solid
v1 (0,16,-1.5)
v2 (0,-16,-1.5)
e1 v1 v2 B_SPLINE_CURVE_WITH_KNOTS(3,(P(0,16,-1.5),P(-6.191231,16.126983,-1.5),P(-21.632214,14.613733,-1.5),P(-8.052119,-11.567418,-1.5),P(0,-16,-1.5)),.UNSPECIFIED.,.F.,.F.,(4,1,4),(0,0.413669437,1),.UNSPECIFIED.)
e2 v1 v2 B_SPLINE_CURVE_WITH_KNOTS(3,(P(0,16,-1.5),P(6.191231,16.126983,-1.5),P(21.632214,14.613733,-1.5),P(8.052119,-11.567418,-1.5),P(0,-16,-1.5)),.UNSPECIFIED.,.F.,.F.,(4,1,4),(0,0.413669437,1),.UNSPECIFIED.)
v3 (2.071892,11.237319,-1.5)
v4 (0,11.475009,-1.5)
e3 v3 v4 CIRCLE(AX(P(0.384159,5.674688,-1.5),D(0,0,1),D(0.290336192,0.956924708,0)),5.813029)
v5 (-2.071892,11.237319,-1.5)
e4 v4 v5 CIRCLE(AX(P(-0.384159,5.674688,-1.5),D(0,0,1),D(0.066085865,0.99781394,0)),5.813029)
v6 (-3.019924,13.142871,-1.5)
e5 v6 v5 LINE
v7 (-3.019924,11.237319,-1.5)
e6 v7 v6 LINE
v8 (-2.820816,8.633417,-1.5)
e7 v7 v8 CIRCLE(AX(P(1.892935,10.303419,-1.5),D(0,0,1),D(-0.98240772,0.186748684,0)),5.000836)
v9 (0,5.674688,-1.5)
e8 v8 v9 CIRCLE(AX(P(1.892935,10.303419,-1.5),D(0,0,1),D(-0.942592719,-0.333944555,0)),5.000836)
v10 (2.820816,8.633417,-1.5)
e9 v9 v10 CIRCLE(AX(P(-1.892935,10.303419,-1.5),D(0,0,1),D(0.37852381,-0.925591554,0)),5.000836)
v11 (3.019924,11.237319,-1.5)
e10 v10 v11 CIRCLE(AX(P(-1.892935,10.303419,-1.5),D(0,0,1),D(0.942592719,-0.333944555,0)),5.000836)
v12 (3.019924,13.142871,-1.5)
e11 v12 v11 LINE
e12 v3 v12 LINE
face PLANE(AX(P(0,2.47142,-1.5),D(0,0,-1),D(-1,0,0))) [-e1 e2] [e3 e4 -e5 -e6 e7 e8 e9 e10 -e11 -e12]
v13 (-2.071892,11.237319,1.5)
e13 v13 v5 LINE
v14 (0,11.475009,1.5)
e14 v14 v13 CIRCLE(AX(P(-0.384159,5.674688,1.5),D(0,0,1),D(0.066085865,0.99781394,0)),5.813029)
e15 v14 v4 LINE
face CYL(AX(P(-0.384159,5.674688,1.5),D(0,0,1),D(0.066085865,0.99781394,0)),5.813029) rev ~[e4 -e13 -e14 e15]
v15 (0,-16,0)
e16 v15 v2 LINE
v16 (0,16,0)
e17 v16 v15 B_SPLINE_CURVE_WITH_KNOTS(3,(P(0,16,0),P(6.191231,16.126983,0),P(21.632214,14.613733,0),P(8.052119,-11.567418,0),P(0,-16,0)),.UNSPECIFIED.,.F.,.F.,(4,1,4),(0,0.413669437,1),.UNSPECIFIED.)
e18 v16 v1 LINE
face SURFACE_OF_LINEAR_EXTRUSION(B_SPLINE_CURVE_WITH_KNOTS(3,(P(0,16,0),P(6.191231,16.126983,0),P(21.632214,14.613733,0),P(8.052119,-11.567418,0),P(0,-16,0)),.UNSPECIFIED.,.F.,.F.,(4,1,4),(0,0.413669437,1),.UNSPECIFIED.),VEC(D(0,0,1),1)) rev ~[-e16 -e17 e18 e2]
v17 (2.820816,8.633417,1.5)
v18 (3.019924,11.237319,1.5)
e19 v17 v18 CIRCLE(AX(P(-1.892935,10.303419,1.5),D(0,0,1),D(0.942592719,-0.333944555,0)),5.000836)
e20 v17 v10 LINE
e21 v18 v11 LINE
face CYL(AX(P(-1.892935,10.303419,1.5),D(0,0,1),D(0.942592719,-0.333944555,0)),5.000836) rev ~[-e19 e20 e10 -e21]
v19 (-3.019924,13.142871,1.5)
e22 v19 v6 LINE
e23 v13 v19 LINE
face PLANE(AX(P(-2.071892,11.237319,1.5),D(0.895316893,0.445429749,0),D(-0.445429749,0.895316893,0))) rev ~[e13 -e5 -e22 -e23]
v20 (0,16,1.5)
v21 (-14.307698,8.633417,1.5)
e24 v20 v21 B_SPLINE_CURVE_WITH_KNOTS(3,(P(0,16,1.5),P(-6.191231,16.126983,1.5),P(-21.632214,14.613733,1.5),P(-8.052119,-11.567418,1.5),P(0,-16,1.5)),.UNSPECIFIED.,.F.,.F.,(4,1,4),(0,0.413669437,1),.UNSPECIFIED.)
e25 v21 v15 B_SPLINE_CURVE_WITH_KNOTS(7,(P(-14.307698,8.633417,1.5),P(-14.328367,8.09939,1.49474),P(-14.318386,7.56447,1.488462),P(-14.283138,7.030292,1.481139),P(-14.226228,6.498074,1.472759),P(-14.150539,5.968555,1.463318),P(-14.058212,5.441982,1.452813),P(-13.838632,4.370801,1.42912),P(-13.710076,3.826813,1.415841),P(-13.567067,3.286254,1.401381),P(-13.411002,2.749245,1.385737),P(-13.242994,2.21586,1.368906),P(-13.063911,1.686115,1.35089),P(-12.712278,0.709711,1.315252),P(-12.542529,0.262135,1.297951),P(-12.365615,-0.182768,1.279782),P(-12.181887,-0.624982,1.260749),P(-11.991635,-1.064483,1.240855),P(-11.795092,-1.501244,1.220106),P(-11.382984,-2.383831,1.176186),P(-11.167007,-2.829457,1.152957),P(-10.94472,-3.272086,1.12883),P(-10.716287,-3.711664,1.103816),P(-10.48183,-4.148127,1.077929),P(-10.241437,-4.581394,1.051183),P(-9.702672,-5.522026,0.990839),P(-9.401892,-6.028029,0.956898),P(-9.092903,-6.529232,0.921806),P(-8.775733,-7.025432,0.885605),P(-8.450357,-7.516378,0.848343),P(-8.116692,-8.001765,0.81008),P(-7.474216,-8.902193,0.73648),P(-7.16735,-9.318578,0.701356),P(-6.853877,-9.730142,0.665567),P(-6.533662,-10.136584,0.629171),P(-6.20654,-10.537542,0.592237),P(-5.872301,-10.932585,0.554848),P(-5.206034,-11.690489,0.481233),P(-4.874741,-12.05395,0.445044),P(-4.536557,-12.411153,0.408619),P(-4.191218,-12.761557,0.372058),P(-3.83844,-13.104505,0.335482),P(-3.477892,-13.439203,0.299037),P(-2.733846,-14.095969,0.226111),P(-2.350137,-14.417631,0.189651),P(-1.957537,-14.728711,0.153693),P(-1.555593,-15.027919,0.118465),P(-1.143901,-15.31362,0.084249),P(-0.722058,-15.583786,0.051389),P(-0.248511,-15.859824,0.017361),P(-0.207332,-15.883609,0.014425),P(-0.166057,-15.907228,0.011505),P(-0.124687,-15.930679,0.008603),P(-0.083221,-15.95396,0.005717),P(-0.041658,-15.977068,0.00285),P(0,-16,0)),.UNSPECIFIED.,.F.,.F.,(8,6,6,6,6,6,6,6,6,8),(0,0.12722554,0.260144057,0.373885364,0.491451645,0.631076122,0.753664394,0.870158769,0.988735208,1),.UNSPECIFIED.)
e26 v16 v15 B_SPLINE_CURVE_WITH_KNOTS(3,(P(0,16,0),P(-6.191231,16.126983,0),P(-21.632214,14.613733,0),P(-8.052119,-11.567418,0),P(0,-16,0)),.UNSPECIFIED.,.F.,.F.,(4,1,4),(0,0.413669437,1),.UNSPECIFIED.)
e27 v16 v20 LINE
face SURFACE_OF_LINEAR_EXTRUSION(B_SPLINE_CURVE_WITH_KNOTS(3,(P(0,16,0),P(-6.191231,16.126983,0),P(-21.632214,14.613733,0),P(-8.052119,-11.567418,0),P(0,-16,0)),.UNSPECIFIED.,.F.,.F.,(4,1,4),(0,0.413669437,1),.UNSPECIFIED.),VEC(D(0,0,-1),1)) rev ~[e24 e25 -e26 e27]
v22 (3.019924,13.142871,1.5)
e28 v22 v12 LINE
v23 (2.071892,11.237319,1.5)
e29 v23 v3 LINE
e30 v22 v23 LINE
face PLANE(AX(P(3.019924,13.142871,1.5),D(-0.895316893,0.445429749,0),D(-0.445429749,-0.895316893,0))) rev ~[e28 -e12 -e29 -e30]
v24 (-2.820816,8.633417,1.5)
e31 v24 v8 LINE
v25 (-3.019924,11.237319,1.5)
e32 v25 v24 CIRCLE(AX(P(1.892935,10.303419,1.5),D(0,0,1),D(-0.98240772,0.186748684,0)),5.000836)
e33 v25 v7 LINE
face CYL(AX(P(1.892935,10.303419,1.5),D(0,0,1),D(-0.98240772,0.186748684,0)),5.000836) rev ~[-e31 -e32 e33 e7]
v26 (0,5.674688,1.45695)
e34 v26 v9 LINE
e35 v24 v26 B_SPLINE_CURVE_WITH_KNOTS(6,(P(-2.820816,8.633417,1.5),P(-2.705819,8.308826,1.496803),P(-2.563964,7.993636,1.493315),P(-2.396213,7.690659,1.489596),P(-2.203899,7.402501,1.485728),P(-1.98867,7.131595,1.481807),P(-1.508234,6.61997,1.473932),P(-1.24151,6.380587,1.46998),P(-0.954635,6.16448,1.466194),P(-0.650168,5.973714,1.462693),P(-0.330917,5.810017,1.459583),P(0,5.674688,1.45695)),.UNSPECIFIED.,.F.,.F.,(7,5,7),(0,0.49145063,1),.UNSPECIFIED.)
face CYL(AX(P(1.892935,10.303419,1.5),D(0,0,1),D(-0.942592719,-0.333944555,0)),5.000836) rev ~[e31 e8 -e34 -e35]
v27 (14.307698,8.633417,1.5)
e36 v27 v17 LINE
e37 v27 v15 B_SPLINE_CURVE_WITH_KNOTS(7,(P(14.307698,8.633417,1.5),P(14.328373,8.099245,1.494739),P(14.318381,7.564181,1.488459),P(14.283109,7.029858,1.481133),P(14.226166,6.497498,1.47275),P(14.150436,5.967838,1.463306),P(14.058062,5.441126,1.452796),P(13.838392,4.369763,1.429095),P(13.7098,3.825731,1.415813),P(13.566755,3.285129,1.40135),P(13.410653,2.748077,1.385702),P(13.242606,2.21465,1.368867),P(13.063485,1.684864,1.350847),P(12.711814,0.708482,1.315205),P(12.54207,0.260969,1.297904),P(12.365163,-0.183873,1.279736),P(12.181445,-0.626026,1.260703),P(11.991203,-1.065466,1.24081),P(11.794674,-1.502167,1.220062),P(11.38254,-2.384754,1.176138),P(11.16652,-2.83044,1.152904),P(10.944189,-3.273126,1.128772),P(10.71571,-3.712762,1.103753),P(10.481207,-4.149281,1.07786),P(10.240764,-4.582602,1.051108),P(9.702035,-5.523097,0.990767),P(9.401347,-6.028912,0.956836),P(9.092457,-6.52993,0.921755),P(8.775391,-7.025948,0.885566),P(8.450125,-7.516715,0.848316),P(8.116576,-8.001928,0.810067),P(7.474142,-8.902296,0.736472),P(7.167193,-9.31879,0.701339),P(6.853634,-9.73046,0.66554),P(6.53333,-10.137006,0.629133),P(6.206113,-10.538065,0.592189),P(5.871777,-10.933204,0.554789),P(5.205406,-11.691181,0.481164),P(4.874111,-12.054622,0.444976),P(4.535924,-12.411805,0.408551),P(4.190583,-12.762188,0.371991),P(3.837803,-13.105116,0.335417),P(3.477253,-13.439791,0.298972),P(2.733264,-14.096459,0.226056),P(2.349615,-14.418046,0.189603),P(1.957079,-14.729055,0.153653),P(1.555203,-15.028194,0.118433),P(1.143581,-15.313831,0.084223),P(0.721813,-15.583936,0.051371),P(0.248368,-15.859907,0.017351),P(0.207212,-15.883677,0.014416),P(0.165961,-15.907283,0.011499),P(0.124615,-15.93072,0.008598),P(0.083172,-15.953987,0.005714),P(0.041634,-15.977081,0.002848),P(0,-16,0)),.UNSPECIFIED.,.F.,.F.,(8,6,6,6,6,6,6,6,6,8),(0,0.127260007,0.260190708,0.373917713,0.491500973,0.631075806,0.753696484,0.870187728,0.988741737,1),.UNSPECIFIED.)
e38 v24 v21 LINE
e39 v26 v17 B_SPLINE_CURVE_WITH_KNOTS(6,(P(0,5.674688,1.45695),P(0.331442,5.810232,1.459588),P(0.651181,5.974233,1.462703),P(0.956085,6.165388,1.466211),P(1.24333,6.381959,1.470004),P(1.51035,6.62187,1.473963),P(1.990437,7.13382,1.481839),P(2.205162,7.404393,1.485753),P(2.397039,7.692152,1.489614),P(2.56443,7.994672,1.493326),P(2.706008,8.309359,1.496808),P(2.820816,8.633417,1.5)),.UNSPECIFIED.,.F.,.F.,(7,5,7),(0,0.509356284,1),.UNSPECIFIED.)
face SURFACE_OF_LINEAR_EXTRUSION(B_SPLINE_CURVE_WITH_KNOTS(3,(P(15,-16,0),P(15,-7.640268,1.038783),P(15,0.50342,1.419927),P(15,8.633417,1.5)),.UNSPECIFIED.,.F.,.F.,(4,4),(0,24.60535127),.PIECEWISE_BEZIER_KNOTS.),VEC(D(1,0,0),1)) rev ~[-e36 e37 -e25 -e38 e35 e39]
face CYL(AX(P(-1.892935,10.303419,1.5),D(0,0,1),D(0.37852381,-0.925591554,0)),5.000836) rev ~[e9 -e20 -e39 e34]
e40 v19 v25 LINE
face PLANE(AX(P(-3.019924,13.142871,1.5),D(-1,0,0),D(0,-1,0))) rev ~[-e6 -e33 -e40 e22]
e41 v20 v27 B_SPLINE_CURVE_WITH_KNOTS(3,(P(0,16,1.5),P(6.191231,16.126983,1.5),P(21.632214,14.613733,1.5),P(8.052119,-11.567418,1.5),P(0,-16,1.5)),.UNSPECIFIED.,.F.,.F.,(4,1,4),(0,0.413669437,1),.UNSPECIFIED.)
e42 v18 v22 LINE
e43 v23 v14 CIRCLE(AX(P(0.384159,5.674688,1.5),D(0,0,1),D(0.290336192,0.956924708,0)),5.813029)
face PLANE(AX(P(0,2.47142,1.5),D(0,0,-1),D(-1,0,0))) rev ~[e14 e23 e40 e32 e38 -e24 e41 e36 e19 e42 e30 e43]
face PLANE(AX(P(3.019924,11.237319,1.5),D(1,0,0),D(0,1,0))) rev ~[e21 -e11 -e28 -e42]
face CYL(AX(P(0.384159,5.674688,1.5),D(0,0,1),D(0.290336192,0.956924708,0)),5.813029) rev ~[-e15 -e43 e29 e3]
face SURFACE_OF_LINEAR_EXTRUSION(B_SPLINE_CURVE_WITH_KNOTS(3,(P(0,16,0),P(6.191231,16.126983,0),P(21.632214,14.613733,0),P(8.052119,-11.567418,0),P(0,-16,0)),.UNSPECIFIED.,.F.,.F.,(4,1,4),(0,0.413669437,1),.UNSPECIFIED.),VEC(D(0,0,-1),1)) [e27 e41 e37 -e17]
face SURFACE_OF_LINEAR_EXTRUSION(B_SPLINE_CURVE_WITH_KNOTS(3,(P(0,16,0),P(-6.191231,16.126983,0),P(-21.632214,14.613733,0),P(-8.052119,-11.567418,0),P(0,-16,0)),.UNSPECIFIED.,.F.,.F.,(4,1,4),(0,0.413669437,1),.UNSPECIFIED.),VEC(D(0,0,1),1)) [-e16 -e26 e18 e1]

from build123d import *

# Parameters (mm, degrees)
F1_DEPTH = 1.5
F4_DEPTH = 35
F6_DEPTH = 25


with BuildPart() as f1:
    # F0 (on Top) → F1 (new body, symmetric)
    with BuildSketch(Plane.XY):
        with BuildLine():
            add(Edge.make_bspline(
                [(0, 16), (6.1912308447, 16.1269828677), (21.6322143415, 14.6137327369), (8.0521190539, -11.5674184635), (0, -16)],
                knots=[0, 0, 0, 0, 0.4136694367, 1, 1, 1, 1], degree=3))
            add(Edge.make_bspline(
                [(0, 16), (-6.1912308447, 16.1269828677), (-21.6322143415, 14.6137327369), (-8.0521190539, -11.5674184635), (0, -16)],
                knots=[0, 0, 0, 0, 0.4136694367, 1, 1, 1, 1], degree=3))
        make_face()
    extrude(amount=F1_DEPTH, both=True)

    # F3 (on offset) → F4 (cut)
    with BuildSketch(Plane.YZ.offset(15)):
        with BuildLine():
            add(Edge.make_bspline(
                [(-16, 0), (-7.6402679005, 1.0387831861), (0.5034198032, 1.4199266316), (8.633417238, 1.5)],
                knots=[0, 0, 0, 0, 24.6053512698, 24.6053512698, 24.6053512698, 24.6053512698], degree=3))
            Line((8.633417238, 1.5), (-16, 1.5))
            Line((-16, 1.5), (-16, 0))
        make_face()
    extrude(amount=-F4_DEPTH, mode=Mode.SUBTRACT)

    # F5 (on face) → F6 (cut)
    with BuildSketch(Plane.XY.offset(1.5)):
        with BuildLine():
            ThreePointArc((2.0718916785, 11.2373186275), (1.0466922086, 11.4498374057), (0, 11.4750089124))
            ThreePointArc((0, 11.4750089124), (-1.0466922086, 11.4498374057), (-2.0718916785, 11.2373186275))
            Line((-2.0718916785, 11.2373186275), (-3.0199242756, 13.1428707391))
            Line((-3.0199242756, 13.1428707391), (-3.0199242756, 11.2373186275))
            ThreePointArc((-3.0199242756, 11.2373186275), (-3.0933443524, 9.9221413952), (-2.8208159928, 8.633417238))
            Line((-2.8208159928, 8.633417238), (2.8208159928, 8.633417238))
            ThreePointArc((2.8208159928, 8.633417238), (3.0933443524, 9.9221413952), (3.0199242756, 11.2373186275))
            Line((3.0199242756, 11.2373186275), (3.0199242756, 13.1428707391))
            Line((3.0199242756, 13.1428707391), (2.0718916785, 11.2373186275))
        make_face()
        with BuildLine():
            Line((2.8208159928, 8.633417238), (-2.8208159928, 8.633417238))
            ThreePointArc((-2.8208159928, 8.633417238), (-1.7265393737, 6.8526567573), (0, 5.6746877424))
            ThreePointArc((0, 5.6746877424), (1.7265393737, 6.8526567573), (2.8208159928, 8.633417238))
        make_face()
    extrude(amount=-F6_DEPTH, mode=Mode.SUBTRACT)


solid = f1.part
